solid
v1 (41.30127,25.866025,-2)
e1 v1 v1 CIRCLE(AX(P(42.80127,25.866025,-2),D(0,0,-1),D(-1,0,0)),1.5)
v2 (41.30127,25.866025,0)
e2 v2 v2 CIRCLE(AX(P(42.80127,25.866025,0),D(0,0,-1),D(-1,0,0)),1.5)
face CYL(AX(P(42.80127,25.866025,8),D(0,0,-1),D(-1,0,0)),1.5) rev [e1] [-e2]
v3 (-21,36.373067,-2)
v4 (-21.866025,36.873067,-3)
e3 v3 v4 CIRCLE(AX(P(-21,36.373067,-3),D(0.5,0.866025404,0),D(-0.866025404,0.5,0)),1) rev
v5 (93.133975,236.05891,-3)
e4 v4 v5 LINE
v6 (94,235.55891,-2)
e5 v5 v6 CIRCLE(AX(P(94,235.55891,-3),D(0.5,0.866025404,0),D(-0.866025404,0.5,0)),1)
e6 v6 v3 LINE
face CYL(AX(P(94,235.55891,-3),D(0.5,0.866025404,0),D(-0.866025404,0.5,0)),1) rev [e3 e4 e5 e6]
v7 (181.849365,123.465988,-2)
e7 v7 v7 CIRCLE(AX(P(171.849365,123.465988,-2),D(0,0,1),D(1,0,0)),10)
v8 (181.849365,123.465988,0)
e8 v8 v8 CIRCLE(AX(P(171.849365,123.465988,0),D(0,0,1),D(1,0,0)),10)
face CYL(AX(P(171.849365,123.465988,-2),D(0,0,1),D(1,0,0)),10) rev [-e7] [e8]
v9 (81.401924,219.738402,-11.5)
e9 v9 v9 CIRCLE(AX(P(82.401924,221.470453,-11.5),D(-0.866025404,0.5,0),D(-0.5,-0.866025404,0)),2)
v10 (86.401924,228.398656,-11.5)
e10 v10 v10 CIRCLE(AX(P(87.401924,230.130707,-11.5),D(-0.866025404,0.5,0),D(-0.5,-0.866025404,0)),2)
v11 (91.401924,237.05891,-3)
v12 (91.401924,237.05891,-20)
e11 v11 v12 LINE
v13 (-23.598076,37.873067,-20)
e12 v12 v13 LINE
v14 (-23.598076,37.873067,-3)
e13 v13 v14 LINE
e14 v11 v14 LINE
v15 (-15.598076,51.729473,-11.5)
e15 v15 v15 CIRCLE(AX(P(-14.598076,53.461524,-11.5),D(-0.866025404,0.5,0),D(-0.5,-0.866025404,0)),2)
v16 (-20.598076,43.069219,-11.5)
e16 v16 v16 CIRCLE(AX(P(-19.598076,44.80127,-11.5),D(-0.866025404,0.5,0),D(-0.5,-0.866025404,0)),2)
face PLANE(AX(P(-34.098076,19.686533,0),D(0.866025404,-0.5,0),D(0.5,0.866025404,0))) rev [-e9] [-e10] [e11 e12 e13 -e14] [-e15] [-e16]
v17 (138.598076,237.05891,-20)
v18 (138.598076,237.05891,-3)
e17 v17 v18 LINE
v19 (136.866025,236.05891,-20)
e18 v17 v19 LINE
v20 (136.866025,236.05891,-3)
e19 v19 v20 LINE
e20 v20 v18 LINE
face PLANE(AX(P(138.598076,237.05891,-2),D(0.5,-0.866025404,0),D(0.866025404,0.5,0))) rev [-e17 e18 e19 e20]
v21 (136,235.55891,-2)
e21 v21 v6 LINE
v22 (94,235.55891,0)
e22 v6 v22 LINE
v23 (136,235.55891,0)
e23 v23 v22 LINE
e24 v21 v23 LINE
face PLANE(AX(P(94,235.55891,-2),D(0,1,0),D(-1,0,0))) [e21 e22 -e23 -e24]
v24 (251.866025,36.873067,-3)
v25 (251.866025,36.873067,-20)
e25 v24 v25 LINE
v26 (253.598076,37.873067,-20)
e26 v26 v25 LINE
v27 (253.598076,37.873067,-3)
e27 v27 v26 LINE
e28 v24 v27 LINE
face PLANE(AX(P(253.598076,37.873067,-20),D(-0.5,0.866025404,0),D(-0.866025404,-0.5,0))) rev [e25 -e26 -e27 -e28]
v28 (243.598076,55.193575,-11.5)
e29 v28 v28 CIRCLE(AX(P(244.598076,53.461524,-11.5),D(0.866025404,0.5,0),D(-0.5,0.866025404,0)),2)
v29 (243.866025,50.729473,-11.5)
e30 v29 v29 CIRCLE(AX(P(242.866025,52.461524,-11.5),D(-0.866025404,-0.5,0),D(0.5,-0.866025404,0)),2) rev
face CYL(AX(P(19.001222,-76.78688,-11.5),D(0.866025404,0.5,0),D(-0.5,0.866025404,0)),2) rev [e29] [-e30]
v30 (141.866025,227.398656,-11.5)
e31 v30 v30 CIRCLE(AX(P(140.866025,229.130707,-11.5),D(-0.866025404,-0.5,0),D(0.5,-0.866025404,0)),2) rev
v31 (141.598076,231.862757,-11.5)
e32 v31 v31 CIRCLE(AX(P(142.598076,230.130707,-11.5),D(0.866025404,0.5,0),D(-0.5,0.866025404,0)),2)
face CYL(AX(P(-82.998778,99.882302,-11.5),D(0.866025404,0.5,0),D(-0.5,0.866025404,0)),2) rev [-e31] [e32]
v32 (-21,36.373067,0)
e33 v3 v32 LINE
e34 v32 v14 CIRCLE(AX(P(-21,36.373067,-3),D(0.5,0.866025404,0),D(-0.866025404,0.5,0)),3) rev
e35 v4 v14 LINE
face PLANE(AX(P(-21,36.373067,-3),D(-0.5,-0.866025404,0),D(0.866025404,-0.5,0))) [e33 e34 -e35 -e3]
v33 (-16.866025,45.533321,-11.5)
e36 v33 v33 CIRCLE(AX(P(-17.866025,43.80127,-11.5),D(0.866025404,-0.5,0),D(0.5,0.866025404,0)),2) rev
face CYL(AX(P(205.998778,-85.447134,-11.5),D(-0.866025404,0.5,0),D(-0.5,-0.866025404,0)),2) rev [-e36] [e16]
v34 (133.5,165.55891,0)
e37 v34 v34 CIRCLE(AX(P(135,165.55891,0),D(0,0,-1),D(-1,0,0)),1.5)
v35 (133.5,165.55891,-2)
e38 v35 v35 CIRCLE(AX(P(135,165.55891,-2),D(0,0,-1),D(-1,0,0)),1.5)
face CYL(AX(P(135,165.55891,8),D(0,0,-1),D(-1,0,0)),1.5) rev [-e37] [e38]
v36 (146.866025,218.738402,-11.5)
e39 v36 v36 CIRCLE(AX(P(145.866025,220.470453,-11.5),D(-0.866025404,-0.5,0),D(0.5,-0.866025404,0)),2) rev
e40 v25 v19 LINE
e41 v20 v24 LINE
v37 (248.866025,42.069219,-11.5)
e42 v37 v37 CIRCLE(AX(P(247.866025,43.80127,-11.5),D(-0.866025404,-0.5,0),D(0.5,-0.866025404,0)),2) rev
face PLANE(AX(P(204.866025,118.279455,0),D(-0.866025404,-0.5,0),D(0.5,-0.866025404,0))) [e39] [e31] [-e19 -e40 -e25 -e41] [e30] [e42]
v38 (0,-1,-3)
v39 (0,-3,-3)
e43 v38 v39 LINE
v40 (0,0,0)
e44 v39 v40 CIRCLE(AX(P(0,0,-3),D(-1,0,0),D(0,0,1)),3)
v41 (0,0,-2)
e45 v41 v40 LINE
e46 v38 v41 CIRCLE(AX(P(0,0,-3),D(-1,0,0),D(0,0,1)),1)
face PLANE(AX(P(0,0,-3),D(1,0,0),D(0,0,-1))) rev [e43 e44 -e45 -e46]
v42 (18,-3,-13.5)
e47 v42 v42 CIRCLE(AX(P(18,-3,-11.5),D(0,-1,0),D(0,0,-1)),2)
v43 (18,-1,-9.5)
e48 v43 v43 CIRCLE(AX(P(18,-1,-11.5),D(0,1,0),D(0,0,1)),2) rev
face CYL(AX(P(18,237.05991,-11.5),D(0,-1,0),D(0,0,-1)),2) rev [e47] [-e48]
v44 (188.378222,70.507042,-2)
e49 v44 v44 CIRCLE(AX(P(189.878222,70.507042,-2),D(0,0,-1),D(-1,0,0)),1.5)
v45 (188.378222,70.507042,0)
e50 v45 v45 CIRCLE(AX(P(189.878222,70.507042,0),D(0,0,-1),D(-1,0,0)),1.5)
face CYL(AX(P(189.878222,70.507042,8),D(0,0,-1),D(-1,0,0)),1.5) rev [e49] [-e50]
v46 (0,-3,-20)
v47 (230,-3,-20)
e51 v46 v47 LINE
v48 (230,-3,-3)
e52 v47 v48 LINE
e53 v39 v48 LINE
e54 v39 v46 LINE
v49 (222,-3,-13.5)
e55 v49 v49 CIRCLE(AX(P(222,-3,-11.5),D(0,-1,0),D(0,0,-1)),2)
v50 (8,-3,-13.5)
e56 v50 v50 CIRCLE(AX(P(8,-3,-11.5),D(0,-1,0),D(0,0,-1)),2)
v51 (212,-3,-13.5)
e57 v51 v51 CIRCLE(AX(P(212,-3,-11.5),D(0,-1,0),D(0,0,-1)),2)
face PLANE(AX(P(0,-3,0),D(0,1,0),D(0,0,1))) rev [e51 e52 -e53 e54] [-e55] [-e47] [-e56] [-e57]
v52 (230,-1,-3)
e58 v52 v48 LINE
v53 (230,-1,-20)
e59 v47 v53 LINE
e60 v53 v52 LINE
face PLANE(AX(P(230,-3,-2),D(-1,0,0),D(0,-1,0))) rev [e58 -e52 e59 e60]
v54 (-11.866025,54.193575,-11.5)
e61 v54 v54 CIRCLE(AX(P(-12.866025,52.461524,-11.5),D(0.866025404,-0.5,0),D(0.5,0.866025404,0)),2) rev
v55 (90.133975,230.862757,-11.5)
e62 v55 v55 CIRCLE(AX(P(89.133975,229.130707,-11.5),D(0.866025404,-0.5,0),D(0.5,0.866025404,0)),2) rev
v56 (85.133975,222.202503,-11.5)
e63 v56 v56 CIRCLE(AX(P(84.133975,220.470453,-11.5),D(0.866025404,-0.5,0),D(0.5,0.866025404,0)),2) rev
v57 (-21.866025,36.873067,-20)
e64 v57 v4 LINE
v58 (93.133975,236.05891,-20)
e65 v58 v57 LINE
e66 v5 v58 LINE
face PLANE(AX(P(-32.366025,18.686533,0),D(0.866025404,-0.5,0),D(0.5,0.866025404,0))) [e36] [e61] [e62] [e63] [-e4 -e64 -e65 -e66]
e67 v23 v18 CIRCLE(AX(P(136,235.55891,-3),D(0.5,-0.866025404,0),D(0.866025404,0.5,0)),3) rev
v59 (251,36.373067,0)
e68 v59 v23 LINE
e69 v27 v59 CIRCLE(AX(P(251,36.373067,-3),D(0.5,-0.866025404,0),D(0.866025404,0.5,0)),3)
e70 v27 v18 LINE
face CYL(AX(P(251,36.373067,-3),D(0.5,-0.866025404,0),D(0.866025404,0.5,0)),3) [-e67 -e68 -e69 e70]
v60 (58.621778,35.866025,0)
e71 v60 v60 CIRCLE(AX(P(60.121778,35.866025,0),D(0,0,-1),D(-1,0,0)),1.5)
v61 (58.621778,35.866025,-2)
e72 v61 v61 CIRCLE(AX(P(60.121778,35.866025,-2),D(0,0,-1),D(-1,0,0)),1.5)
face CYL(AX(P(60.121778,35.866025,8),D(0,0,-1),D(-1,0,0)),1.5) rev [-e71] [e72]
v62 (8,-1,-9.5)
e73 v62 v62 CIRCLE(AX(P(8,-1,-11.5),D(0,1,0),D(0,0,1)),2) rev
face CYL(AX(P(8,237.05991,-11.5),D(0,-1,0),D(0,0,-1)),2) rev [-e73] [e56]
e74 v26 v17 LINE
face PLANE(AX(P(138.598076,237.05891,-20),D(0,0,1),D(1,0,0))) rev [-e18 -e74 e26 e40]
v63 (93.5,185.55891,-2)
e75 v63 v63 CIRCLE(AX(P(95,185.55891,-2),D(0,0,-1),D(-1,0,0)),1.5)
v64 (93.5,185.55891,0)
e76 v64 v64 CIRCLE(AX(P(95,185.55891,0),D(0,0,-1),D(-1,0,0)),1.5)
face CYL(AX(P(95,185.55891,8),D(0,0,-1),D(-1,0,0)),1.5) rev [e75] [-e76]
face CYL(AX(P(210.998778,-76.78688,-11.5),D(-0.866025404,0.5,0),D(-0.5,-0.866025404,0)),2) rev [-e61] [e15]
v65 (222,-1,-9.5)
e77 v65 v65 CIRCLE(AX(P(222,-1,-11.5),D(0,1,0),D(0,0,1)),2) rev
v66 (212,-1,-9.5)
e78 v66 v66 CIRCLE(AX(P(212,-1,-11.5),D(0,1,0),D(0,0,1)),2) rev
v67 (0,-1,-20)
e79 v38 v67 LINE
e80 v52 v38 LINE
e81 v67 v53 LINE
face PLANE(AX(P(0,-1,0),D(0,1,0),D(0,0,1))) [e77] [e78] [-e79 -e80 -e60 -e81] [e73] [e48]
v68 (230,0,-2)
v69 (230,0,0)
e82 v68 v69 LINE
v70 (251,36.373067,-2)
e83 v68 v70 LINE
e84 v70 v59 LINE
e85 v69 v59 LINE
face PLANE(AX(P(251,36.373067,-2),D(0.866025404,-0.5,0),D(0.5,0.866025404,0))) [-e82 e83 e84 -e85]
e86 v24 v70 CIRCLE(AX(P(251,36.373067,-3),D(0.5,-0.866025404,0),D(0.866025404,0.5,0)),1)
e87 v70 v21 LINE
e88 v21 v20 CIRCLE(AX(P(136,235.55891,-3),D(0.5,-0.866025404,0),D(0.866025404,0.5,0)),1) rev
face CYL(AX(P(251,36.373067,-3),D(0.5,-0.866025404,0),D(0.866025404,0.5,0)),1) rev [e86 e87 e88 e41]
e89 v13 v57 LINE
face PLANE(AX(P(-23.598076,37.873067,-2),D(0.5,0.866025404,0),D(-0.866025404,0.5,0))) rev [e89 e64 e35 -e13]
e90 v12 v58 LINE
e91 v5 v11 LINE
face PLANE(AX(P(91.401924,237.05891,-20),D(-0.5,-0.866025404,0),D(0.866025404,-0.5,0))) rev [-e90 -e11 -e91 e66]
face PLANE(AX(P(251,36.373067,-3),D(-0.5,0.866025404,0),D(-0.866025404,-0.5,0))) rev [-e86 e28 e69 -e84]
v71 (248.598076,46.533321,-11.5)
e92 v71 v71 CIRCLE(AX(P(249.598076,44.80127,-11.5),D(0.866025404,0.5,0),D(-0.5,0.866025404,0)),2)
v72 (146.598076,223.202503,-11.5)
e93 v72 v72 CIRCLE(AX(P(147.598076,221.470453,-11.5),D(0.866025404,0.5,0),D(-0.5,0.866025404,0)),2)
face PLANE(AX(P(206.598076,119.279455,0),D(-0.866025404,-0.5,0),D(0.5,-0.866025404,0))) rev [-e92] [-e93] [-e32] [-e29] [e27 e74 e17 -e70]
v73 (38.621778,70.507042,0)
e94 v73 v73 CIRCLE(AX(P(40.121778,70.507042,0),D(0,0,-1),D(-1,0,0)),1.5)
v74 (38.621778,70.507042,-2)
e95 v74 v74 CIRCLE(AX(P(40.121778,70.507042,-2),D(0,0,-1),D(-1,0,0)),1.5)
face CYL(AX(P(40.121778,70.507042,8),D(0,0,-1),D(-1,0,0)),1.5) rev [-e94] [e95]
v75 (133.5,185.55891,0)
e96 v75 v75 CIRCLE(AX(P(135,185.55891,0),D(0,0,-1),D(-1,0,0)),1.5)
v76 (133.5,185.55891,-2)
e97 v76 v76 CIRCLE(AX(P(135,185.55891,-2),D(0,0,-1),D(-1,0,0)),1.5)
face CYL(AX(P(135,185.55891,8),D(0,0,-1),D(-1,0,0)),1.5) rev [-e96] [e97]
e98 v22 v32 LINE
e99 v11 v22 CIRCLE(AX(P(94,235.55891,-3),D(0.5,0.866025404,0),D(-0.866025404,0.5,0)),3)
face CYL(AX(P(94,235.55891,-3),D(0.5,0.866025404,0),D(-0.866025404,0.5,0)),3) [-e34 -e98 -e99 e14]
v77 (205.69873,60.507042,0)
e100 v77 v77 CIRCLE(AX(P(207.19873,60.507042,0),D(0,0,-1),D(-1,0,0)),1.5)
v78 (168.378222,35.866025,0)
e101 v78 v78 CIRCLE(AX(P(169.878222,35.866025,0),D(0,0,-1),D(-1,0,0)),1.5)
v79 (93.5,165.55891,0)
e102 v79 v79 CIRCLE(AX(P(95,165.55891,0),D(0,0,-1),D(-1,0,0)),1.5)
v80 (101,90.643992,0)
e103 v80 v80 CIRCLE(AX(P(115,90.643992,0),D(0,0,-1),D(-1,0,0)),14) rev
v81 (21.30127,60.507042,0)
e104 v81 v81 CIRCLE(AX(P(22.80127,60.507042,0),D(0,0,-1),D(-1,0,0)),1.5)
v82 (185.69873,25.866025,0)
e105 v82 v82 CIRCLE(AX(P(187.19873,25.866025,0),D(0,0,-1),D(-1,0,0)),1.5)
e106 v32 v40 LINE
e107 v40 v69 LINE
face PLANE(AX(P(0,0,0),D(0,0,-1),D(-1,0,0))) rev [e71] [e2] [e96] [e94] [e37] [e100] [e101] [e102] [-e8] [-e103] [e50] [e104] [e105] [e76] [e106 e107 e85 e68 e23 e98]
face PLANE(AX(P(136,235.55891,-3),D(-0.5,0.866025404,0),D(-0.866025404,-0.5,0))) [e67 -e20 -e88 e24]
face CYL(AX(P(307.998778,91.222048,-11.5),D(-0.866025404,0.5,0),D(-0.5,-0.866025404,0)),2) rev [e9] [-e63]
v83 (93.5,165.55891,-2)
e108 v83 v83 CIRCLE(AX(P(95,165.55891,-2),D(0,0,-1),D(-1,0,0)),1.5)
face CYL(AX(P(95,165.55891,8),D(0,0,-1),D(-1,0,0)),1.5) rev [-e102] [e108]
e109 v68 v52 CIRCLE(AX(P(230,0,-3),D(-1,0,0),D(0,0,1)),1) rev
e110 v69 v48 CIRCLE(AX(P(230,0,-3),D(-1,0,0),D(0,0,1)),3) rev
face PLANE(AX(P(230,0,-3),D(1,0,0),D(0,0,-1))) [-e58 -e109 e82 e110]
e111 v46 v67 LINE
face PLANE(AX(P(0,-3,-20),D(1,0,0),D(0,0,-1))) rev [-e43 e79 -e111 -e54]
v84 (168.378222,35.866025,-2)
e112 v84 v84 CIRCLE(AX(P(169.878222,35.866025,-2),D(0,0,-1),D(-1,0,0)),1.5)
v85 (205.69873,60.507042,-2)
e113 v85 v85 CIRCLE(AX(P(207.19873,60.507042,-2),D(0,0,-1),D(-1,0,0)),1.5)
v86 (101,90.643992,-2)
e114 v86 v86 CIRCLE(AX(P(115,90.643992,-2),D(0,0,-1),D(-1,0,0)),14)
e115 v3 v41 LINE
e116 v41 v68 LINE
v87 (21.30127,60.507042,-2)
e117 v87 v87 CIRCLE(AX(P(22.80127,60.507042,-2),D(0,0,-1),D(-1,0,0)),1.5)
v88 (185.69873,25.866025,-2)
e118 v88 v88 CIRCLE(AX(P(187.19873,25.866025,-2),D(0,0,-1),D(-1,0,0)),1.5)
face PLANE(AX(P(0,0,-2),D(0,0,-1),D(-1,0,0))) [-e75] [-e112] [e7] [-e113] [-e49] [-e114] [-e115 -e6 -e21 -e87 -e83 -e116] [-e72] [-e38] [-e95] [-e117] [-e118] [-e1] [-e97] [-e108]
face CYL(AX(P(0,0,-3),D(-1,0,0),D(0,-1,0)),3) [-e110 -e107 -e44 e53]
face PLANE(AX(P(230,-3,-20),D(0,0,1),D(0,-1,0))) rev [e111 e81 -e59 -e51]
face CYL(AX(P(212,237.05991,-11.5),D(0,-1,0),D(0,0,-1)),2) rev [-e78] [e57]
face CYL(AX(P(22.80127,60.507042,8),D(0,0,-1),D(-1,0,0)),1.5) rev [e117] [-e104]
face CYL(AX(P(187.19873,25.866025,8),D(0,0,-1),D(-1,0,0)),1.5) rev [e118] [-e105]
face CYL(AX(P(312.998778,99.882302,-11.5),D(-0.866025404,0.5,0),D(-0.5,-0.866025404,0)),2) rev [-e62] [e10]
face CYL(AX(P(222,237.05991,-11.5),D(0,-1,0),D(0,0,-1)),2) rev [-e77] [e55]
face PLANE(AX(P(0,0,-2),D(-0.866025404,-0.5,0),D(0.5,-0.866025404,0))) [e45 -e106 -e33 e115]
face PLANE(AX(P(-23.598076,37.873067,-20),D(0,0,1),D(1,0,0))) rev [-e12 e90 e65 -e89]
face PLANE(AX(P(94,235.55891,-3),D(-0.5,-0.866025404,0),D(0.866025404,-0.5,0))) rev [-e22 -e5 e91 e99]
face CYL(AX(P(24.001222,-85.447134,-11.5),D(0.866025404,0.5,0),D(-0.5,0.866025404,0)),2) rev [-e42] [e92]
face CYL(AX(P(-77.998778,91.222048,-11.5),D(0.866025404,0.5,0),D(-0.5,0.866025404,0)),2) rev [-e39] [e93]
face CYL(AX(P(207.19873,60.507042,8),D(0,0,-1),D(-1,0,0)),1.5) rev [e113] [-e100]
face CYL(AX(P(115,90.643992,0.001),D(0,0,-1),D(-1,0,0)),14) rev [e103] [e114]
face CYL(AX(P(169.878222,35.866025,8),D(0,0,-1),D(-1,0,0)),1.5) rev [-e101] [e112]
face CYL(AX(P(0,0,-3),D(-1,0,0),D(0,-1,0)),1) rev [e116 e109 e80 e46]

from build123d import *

# Parameters (mm, degrees)
SKETCH_10_R                   = 10
SM_BASE_FLANGE_3_DEPTH        = 2
SM_EDGE_FLANGE_6_DEPTH        = 230
SM_EDGE_FLANGE_6_BEND_DEPTH   = 230
SM_EDGE_FLANGE_6_BEND_2_DEPTH = 230
CUT_EXTRUDE_4_REACH           = 363.137
SKETCH_47_R                   = 2
CUT_EXTRUDE_6_REACH           = 263.424
SKETCH_50_R                   = 2
CUT_EXTRUDE_7_REACH           = 351.772
SKETCH_51_R                   = 2
CUT_EXTRUDE_8_REACH           = 349.61
SKETCH_52_R                   = 14
SKETCH_53_R                   = 1.5
CUT_EXTRUDE_9_DEPTH           = 10


# Sheet-metal steps are written as plain solids
with BuildPart() as part:
    # Эскиз10 → Базовая кромка3 (new body)
    with BuildSketch(Plane.XY):
        Polygon((0, 0), (-21, 36.373066959), (94, 235.558909829), (136, 235.558909829), (251, 36.373066959), (230, 0), align=None)
        with Locations((171.849364905, 123.465988394)):
            Circle(SKETCH_10_R, mode=Mode.SUBTRACT)
    extrude(amount=-SM_BASE_FLANGE_3_DEPTH)

    # Ребро-кромка6 section (across the edge) → Ребро-кромка6 (add)
    with BuildSketch(Plane(origin=(-21.866025404, 36.873066959, -2), x_dir=(0.8660254037844436, -0.4999999999999914, -3.4914813388431334e-15), z_dir=(0.4999999999999914, 0.8660254037844436, 0))):
        with BuildLine():
            Line((-2, 1), (-2, 18))
            Line((-2, 18), (0, 18))
            Line((0, 18), (0, 1))
            ThreePointArc((0, 1), (0.292893219, 0.292893219), (1, 0))
            Line((1, 0), (1, -2))
            ThreePointArc((1, -2), (-1.121320344, -1.121320344), (-2, 1))
        make_face()
    extrude(amount=SM_EDGE_FLANGE_6_DEPTH)

    # Ребро-кромка6 section 2 (across the edge) → Ребро-кромка6 bend (add)
    with BuildSketch(Plane(origin=(136.866025404, 236.058909829, -2), x_dir=(-0.8660254037844363, -0.5000000000000041, -3.4914813388431334e-15), z_dir=(0.5000000000000041, -0.8660254037844363, 0))):
        with BuildLine():
            Line((-2, 1), (-2, 18))
            Line((-2, 18), (0, 18))
            Line((0, 18), (0, 1))
            ThreePointArc((0, 1), (0.292893219, 0.292893219), (1, 0))
            Line((1, 0), (1, -2))
            ThreePointArc((1, -2), (-1.121320344, -1.121320344), (-2, 1))
        make_face()
    extrude(amount=SM_EDGE_FLANGE_6_BEND_DEPTH)

    # Ребро-кромка6 section 3 (across the edge) → Ребро-кромка6 bend 2 (add)
    with BuildSketch(Plane(origin=(230, -1, -2), x_dir=(0, 1, 0), z_dir=(-1, 0, 0))):
        with BuildLine():
            Line((-2, 1), (-2, 18))
            Line((-2, 18), (0, 18))
            Line((0, 18), (0, 1))
            ThreePointArc((0, 1), (0.292893219, 0.292893219), (1, 0))
            Line((1, 0), (1, -2))
            ThreePointArc((1, -2), (-1.121320344, -1.121320344), (-2, 1))
        make_face()
    extrude(amount=SM_EDGE_FLANGE_6_BEND_2_DEPTH)

    # Эскиз47 → Вырез-Вытянуть4 (cut, up to next)
    with BuildSketch(Plane(origin=(-34.098076211, 19.686533479, 0), x_dir=(0, 0, 1), z_dir=(-0.866025403784443, 0.4999999999999925, 3.788649256556814e-15)), mode=Mode.PRIVATE) as cut_extrude_4_sk1:
        with Locations(Location((-11.5, 29, 0), (0, 0, 270))):
            Circle(SKETCH_47_R)
    cut_extrude_4_tool1 = extrude(cut_extrude_4_sk1.sketch, amount=-CUT_EXTRUDE_4_REACH, mode=Mode.PRIVATE) & part.part
    # Эскиз47 → Вырез-Вытянуть4 (cut, up to next)
    with BuildSketch(Plane(origin=(-34.098076211, 19.686533479, 0), x_dir=(0, 0, 1), z_dir=(-0.866025403784443, 0.4999999999999925, 3.788649256556814e-15)), mode=Mode.PRIVATE) as cut_extrude_4_sk2:
        with Locations(Location((-11.5, 39, 0), (0, 0, 270))):
            Circle(SKETCH_47_R)
    cut_extrude_4_tool2 = extrude(cut_extrude_4_sk2.sketch, amount=-CUT_EXTRUDE_4_REACH, mode=Mode.PRIVATE) & part.part
    # Эскиз47 → Вырез-Вытянуть4 (cut, up to next)
    with BuildSketch(Plane(origin=(-34.098076211, 19.686533479, 0), x_dir=(0, 0, 1), z_dir=(-0.866025403784443, 0.4999999999999925, 3.788649256556814e-15)), mode=Mode.PRIVATE) as cut_extrude_4_sk3:
        with Locations(Location((-11.5, 233, 0), (0, 0, 270))):
            Circle(SKETCH_47_R)
    cut_extrude_4_tool3 = extrude(cut_extrude_4_sk3.sketch, amount=-CUT_EXTRUDE_4_REACH, mode=Mode.PRIVATE) & part.part
    # Эскиз47 → Вырез-Вытянуть4 (cut, up to next)
    with BuildSketch(Plane(origin=(-34.098076211, 19.686533479, 0), x_dir=(0, 0, 1), z_dir=(-0.866025403784443, 0.4999999999999925, 3.788649256556814e-15)), mode=Mode.PRIVATE) as cut_extrude_4_sk4:
        with Locations(Location((-11.5, 243, 0), (0, 0, 270))):
            Circle(SKETCH_47_R)
    cut_extrude_4_tool4 = extrude(cut_extrude_4_sk4.sketch, amount=-CUT_EXTRUDE_4_REACH, mode=Mode.PRIVATE) & part.part
    add(cut_extrude_4_tool1.solids().sort_by_distance((-19.598076, 44.80127, -11.5))[0], mode=Mode.SUBTRACT)
    add(cut_extrude_4_tool2.solids().sort_by_distance((-14.598076, 53.461524, -11.5))[0], mode=Mode.SUBTRACT)
    add(cut_extrude_4_tool3.solids().sort_by_distance((82.401924, 221.470453, -11.5))[0], mode=Mode.SUBTRACT)
    add(cut_extrude_4_tool4.solids().sort_by_distance((87.401924, 230.130707, -11.5))[0], mode=Mode.SUBTRACT)

    # Эскиз50 → Вырез-Вытянуть6 (cut, up to next)
    with BuildSketch(Plane(origin=(206.598076211, 119.279454915, 0), x_dir=(0, 0, -1), z_dir=(0.866025403784436, 0.5000000000000047, 3.0623287353932815e-15)), mode=Mode.PRIVATE) as cut_extrude_6_sk1:
        with Locations(Location((11.5, -86, 0), (0, 0, 90))):
            Circle(SKETCH_50_R)
    cut_extrude_6_tool1 = extrude(cut_extrude_6_sk1.sketch, amount=-CUT_EXTRUDE_6_REACH, mode=Mode.PRIVATE) & part.part
    # Эскиз50 → Вырез-Вытянуть6 (cut, up to next)
    with BuildSketch(Plane(origin=(206.598076211, 119.279454915, 0), x_dir=(0, 0, -1), z_dir=(0.866025403784436, 0.5000000000000047, 3.0623287353932815e-15)), mode=Mode.PRIVATE) as cut_extrude_6_sk2:
        with Locations(Location((11.5, -76, 0), (0, 0, 90))):
            Circle(SKETCH_50_R)
    cut_extrude_6_tool2 = extrude(cut_extrude_6_sk2.sketch, amount=-CUT_EXTRUDE_6_REACH, mode=Mode.PRIVATE) & part.part
    # Эскиз50 → Вырез-Вытянуть6 (cut, up to next)
    with BuildSketch(Plane(origin=(206.598076211, 119.279454915, 0), x_dir=(0, 0, -1), z_dir=(0.866025403784436, 0.5000000000000047, 3.0623287353932815e-15)), mode=Mode.PRIVATE) as cut_extrude_6_sk3:
        with Locations(Location((11.5, 118, 0), (0, 0, 90))):
            Circle(SKETCH_50_R)
    cut_extrude_6_tool3 = extrude(cut_extrude_6_sk3.sketch, amount=-CUT_EXTRUDE_6_REACH, mode=Mode.PRIVATE) & part.part
    # Эскиз50 → Вырез-Вытянуть6 (cut, up to next)
    with BuildSketch(Plane(origin=(206.598076211, 119.279454915, 0), x_dir=(0, 0, -1), z_dir=(0.866025403784436, 0.5000000000000047, 3.0623287353932815e-15)), mode=Mode.PRIVATE) as cut_extrude_6_sk4:
        with Locations(Location((11.5, 128, 0), (0, 0, 90))):
            Circle(SKETCH_50_R)
    cut_extrude_6_tool4 = extrude(cut_extrude_6_sk4.sketch, amount=-CUT_EXTRUDE_6_REACH, mode=Mode.PRIVATE) & part.part
    add(cut_extrude_6_tool1.solids().sort_by_distance((249.598076, 44.80127, -11.5))[0], mode=Mode.SUBTRACT)
    add(cut_extrude_6_tool2.solids().sort_by_distance((244.598076, 53.461524, -11.5))[0], mode=Mode.SUBTRACT)
    add(cut_extrude_6_tool3.solids().sort_by_distance((147.598076, 221.470453, -11.5))[0], mode=Mode.SUBTRACT)
    add(cut_extrude_6_tool4.solids().sort_by_distance((142.598076, 230.130707, -11.5))[0], mode=Mode.SUBTRACT)

    # Эскиз51 → Вырез-Вытянуть7 (cut, up to next)
    with BuildSketch(Plane.XZ.offset(3), mode=Mode.PRIVATE) as cut_extrude_7_sk1:
        with Locations(Location((222, -11.5, 0), (0, 0, 270))):
            Circle(SKETCH_51_R)
    cut_extrude_7_tool1 = extrude(cut_extrude_7_sk1.sketch, amount=-CUT_EXTRUDE_7_REACH, mode=Mode.PRIVATE) & part.part
    # Эскиз51 → Вырез-Вытянуть7 (cut, up to next)
    with BuildSketch(Plane.XZ.offset(3), mode=Mode.PRIVATE) as cut_extrude_7_sk2:
        with Locations(Location((212, -11.5, 0), (0, 0, 270))):
            Circle(SKETCH_51_R)
    cut_extrude_7_tool2 = extrude(cut_extrude_7_sk2.sketch, amount=-CUT_EXTRUDE_7_REACH, mode=Mode.PRIVATE) & part.part
    # Эскиз51 → Вырез-Вытянуть7 (cut, up to next)
    with BuildSketch(Plane.XZ.offset(3), mode=Mode.PRIVATE) as cut_extrude_7_sk3:
        with Locations(Location((18, -11.5, 0), (0, 0, 270))):
            Circle(SKETCH_51_R)
    cut_extrude_7_tool3 = extrude(cut_extrude_7_sk3.sketch, amount=-CUT_EXTRUDE_7_REACH, mode=Mode.PRIVATE) & part.part
    # Эскиз51 → Вырез-Вытянуть7 (cut, up to next)
    with BuildSketch(Plane.XZ.offset(3), mode=Mode.PRIVATE) as cut_extrude_7_sk4:
        with Locations(Location((8, -11.5, 0), (0, 0, 270))):
            Circle(SKETCH_51_R)
    cut_extrude_7_tool4 = extrude(cut_extrude_7_sk4.sketch, amount=-CUT_EXTRUDE_7_REACH, mode=Mode.PRIVATE) & part.part
    add(cut_extrude_7_tool1.solids().sort_by_distance((222, -3, -11.5))[0], mode=Mode.SUBTRACT)
    add(cut_extrude_7_tool2.solids().sort_by_distance((212, -3, -11.5))[0], mode=Mode.SUBTRACT)
    add(cut_extrude_7_tool3.solids().sort_by_distance((18, -3, -11.5))[0], mode=Mode.SUBTRACT)
    add(cut_extrude_7_tool4.solids().sort_by_distance((8, -3, -11.5))[0], mode=Mode.SUBTRACT)

    # Эскиз52 → Вырез-Вытянуть8 (cut, up to next)
    with BuildSketch(Plane(origin=(0, 0, -2), x_dir=(-1, 0, 0), z_dir=(0, 0, -1)), mode=Mode.PRIVATE) as cut_extrude_8_sk1:
        with Locations((-115, 90.643992263)):
            Circle(SKETCH_52_R)
    cut_extrude_8_tool1 = extrude(cut_extrude_8_sk1.sketch, amount=-CUT_EXTRUDE_8_REACH, mode=Mode.PRIVATE) & part.part
    add(cut_extrude_8_tool1.solids().sort_by_distance((115, 90.643992, -2))[0], mode=Mode.SUBTRACT)

    # Эскиз53 → Вырез-Вытянуть9 (cut)
    with BuildSketch(Plane(origin=(0, 0, -2), x_dir=(-1, 0, 0), z_dir=(0, 0, -1))):
        with Locations((-40.121778265, 70.507041555)):
            Circle(SKETCH_53_R)
        with Locations((-22.801270189, 60.507041555)):
            Circle(SKETCH_53_R)
        with Locations((-60.121778265, 35.866025404)):
            Circle(SKETCH_53_R)
        with Locations((-42.801270189, 25.866025404)):
            Circle(SKETCH_53_R)
        with Locations((-95, 185.558909829)):
            Circle(SKETCH_53_R)
        with Locations((-95, 165.558909829)):
            Circle(SKETCH_53_R)
        with Locations((-135, 185.558909829)):
            Circle(SKETCH_53_R)
        with Locations((-135, 165.558909829)):
            Circle(SKETCH_53_R)
        with Locations((-207.198729811, 60.507041555)):
            Circle(SKETCH_53_R)
        with Locations((-189.878221735, 70.507041555)):
            Circle(SKETCH_53_R)
        with Locations((-187.198729811, 25.866025404)):
            Circle(SKETCH_53_R)
        with Locations((-169.878221735, 35.866025404)):
            Circle(SKETCH_53_R)
    extrude(amount=-CUT_EXTRUDE_9_DEPTH, mode=Mode.SUBTRACT)


solid = part.part
